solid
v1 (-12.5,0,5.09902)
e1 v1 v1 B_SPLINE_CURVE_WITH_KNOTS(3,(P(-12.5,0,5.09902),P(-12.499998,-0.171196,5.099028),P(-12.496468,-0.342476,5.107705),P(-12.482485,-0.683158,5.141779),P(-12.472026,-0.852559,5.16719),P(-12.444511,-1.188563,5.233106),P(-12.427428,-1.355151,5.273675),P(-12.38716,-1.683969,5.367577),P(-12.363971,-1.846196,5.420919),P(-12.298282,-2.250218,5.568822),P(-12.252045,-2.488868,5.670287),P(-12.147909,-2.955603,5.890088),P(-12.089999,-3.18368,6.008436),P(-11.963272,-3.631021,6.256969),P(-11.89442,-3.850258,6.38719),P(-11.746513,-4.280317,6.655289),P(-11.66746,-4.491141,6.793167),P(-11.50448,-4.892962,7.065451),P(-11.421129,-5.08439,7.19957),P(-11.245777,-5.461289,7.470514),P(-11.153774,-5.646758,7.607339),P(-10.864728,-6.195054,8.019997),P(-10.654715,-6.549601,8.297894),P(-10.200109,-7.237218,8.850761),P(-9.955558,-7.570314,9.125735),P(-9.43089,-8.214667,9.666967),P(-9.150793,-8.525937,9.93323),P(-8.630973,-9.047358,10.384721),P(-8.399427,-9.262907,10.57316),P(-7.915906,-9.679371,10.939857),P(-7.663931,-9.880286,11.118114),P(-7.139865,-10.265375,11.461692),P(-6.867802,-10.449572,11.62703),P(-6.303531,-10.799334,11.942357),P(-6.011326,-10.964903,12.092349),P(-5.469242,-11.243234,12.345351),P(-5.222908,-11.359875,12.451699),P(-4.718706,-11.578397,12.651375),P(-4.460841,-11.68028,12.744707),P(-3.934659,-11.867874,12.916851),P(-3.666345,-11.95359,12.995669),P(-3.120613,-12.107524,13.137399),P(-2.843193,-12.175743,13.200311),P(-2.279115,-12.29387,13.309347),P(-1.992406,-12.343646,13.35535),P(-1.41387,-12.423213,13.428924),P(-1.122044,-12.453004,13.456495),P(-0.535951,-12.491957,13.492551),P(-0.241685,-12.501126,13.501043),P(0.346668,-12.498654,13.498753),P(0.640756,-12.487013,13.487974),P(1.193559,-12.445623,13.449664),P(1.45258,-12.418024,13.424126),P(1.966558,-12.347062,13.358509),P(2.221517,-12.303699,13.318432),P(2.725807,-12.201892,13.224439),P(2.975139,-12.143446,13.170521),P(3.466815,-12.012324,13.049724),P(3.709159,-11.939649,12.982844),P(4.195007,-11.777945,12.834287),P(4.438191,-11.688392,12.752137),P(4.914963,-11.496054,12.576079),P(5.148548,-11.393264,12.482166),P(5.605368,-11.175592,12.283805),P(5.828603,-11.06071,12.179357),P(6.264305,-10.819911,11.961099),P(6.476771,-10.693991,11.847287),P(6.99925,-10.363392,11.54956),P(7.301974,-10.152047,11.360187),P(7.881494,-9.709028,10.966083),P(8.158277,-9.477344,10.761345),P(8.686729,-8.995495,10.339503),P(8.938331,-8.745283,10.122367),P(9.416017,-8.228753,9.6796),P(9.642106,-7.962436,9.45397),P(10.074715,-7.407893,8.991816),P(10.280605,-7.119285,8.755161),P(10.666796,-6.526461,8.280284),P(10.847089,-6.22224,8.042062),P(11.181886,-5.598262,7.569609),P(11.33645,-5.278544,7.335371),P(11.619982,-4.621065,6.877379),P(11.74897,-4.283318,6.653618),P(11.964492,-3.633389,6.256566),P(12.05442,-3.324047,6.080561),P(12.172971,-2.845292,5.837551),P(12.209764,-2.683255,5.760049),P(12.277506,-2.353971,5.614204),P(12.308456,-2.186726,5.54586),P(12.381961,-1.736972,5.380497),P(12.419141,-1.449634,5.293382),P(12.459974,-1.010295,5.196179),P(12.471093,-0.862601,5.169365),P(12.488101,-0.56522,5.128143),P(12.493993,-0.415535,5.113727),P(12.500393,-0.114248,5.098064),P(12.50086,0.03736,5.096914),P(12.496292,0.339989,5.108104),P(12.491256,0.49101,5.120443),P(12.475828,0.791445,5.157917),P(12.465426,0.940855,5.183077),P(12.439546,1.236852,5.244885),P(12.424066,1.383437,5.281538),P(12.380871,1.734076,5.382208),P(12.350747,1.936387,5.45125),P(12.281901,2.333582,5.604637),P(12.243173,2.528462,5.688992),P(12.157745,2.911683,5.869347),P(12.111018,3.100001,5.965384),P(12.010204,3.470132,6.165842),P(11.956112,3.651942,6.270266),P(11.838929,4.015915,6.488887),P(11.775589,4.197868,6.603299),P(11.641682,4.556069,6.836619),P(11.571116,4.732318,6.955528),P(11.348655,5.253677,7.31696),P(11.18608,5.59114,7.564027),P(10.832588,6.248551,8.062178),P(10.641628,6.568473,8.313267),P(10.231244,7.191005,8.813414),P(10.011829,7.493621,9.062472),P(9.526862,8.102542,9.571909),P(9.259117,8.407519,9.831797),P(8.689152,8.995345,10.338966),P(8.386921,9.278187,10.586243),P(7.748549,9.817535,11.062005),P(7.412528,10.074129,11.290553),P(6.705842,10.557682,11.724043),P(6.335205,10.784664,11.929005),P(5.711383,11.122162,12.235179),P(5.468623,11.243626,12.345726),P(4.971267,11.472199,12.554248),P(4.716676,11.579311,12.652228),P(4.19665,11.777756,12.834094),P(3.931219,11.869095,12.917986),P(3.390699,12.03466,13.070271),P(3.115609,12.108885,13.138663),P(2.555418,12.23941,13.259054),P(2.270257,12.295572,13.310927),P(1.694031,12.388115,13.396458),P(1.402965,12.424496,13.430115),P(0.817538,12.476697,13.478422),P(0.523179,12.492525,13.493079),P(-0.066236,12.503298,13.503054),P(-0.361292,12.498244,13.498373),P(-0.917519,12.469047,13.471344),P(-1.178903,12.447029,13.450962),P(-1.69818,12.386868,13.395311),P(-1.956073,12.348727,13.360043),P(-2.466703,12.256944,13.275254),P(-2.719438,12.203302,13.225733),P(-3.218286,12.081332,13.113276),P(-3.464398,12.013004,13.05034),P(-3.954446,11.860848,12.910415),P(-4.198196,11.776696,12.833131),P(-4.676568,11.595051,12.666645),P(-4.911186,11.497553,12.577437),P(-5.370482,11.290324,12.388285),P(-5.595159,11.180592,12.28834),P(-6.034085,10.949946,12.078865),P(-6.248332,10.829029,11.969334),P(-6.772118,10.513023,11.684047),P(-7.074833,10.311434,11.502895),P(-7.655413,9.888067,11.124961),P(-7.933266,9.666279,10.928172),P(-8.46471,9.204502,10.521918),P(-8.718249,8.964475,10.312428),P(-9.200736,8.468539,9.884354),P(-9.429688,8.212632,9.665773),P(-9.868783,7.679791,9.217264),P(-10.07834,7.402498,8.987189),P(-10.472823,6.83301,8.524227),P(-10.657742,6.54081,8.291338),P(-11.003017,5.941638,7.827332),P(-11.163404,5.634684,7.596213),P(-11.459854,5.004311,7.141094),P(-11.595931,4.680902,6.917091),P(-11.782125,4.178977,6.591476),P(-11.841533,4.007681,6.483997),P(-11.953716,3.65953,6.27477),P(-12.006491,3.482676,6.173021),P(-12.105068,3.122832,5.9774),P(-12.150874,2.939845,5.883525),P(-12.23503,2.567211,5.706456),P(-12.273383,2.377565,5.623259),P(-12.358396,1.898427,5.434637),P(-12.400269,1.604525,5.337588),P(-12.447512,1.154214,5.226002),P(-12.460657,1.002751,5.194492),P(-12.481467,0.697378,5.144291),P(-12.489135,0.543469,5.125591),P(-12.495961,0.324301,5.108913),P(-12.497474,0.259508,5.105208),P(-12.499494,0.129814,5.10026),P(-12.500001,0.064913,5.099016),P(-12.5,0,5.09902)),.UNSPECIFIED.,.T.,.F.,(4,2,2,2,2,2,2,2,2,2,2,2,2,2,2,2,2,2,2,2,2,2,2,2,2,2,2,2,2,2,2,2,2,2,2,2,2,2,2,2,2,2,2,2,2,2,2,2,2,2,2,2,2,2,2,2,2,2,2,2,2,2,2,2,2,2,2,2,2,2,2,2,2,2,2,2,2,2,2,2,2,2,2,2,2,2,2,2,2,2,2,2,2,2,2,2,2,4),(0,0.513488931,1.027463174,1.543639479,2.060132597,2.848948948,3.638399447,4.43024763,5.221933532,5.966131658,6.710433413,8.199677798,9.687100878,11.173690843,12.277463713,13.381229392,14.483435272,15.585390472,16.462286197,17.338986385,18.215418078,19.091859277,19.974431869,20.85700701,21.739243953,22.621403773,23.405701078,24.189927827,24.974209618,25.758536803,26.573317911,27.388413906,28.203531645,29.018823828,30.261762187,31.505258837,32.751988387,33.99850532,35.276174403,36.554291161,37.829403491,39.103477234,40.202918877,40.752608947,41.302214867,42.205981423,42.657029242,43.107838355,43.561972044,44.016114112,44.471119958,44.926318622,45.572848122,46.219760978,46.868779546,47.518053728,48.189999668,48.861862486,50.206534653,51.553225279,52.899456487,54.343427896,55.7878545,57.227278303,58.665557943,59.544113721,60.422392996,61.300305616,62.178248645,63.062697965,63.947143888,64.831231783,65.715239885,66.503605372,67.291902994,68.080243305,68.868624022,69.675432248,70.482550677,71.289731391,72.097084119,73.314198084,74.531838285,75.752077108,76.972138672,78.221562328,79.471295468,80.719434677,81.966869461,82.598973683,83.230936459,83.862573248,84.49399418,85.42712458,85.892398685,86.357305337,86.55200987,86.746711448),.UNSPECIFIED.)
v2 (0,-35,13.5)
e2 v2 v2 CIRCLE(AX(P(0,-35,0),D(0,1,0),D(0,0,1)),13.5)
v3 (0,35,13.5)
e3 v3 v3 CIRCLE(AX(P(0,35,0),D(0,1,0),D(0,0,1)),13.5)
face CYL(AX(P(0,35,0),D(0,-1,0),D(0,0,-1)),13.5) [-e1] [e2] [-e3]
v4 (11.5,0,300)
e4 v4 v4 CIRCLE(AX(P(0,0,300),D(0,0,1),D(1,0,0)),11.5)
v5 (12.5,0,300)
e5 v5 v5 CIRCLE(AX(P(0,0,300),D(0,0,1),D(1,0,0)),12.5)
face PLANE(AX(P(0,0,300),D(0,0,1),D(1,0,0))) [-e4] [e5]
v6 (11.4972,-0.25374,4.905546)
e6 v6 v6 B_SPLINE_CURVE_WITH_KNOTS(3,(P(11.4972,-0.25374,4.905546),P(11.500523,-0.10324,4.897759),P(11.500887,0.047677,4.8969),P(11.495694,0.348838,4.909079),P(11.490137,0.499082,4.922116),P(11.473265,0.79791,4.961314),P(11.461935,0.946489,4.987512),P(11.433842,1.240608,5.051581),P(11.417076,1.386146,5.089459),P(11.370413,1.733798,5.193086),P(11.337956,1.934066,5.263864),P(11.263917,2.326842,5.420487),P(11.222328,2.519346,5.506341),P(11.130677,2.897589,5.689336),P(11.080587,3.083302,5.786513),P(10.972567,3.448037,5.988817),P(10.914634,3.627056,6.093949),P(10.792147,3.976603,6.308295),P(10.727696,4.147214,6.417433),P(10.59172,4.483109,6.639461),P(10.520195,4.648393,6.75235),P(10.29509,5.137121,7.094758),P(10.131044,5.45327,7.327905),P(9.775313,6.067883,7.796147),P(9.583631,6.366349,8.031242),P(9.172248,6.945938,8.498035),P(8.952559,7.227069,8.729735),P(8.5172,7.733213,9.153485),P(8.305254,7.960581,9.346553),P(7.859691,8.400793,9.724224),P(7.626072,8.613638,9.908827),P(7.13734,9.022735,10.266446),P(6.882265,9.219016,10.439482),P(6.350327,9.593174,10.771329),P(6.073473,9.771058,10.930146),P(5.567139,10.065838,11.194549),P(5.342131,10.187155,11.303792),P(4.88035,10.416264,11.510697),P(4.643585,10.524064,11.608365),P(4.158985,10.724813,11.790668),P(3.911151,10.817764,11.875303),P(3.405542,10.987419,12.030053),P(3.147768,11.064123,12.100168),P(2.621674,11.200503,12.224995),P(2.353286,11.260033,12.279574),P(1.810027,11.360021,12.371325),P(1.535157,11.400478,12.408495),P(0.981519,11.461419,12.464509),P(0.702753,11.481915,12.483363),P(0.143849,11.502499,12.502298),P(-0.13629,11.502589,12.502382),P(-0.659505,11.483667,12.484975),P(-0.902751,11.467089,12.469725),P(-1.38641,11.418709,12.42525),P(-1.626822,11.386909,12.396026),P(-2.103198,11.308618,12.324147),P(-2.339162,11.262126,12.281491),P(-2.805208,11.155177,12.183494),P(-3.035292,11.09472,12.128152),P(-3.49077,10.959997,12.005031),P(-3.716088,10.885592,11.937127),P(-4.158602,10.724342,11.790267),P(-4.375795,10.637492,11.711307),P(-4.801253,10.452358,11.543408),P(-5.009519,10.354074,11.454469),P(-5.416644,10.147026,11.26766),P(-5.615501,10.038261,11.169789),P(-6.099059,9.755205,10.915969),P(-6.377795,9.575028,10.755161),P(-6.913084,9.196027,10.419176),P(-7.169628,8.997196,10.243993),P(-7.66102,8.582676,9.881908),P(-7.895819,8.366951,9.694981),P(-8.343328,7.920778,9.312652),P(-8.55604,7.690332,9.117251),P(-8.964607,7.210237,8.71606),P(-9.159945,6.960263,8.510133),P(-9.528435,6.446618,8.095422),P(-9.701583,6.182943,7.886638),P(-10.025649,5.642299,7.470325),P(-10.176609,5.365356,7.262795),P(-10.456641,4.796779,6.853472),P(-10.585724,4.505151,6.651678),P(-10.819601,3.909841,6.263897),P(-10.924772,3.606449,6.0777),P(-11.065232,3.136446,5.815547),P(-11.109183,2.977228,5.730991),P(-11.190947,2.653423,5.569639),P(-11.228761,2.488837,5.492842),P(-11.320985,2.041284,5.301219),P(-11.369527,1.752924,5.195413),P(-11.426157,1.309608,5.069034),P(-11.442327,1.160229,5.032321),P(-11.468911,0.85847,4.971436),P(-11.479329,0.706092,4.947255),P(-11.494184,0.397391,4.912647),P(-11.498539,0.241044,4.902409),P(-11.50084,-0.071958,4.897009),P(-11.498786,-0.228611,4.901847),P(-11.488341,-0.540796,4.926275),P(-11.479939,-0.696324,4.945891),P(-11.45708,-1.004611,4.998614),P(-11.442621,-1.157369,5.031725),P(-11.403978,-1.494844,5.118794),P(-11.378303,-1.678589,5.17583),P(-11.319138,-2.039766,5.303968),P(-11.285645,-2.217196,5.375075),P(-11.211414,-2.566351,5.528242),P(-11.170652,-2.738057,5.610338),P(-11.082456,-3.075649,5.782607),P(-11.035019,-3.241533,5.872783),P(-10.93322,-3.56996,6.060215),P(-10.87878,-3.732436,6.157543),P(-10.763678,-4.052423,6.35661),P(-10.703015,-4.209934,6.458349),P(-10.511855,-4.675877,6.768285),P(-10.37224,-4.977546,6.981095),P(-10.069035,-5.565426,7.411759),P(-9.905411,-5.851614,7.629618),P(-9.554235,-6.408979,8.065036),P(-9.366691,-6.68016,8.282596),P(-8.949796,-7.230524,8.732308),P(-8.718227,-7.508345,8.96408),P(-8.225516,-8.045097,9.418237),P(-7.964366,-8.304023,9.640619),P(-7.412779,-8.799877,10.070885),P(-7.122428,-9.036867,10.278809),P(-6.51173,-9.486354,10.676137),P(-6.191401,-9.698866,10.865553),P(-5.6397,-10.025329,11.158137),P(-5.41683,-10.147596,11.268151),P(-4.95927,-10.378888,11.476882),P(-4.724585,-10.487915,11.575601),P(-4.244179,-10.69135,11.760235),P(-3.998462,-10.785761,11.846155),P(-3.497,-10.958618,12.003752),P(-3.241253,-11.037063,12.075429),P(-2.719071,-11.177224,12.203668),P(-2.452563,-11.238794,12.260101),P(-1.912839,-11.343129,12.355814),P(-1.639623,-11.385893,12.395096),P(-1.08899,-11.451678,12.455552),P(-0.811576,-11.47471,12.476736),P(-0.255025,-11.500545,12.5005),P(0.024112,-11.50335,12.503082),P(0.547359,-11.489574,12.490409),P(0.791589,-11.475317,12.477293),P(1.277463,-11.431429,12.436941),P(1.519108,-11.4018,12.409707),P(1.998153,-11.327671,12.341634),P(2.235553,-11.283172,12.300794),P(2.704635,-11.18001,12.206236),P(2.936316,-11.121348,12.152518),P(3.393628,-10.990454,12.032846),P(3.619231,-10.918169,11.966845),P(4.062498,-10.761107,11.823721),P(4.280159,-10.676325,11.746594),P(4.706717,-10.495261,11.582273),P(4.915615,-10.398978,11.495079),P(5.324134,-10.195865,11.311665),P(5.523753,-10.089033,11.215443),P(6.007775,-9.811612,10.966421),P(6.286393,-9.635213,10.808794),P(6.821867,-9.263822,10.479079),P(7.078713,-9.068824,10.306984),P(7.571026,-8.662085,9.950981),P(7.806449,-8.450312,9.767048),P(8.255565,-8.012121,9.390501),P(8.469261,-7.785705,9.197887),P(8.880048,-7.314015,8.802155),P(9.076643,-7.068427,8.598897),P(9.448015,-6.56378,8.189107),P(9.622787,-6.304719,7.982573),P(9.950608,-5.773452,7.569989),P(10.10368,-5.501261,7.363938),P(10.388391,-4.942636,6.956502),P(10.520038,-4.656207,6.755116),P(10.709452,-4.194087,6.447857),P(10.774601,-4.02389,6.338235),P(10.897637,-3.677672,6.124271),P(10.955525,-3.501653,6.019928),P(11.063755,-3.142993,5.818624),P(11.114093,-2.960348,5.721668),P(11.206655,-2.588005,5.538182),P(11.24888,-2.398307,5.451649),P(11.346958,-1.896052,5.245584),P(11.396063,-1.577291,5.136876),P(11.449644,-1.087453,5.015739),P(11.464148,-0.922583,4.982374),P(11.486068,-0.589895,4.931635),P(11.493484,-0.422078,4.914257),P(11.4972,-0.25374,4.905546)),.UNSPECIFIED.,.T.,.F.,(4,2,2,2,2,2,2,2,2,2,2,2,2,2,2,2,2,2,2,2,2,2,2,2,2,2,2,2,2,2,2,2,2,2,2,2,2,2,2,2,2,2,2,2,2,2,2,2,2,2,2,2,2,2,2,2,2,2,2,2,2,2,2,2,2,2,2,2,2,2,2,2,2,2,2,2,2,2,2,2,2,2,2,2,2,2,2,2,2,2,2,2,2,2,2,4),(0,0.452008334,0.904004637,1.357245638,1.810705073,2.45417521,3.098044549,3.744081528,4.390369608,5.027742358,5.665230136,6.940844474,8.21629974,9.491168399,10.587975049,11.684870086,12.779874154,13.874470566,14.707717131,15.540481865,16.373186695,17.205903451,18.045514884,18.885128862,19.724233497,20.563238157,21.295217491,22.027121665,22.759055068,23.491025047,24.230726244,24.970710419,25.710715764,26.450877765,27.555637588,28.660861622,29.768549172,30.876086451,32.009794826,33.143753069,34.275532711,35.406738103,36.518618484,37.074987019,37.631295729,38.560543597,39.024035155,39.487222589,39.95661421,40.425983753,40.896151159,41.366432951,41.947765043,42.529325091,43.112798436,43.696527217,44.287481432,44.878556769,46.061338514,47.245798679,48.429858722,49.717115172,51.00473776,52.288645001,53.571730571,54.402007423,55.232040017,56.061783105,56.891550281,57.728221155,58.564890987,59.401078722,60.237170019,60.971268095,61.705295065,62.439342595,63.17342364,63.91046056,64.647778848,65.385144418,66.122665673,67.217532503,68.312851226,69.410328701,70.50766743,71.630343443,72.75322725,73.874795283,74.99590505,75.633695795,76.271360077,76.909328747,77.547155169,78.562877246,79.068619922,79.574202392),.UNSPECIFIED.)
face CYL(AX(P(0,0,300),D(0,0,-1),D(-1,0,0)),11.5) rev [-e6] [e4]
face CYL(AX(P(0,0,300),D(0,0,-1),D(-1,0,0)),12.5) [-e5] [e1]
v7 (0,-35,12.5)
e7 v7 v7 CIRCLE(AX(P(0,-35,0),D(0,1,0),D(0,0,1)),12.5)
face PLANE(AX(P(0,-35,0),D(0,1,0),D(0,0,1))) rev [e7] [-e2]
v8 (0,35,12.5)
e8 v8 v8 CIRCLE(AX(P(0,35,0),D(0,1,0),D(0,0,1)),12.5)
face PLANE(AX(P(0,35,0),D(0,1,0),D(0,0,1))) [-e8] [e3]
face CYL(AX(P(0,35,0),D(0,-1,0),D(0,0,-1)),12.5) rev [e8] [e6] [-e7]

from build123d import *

# Parameters (mm, degrees)
SKETCH1_R           = 13.5
BOSS_EXTRUDE1_DEPTH = 35
SKETCH2_R           = 12.5
BOSS_EXTRUDE2_DEPTH = 300
SHELL1_T            = -1


with BuildPart() as part:
    # Sketch1 → Boss-Extrude1 (new, symmetric)
    with BuildSketch(Plane(origin=(0, 0, 0), x_dir=(1, 0, 0), z_dir=(0, 1, 0))):
        Circle(SKETCH1_R)
    extrude(amount=BOSS_EXTRUDE1_DEPTH, both=True)

    # Sketch2 → Boss-Extrude2 (add)
    with BuildSketch(Plane.XY):
        Circle(SKETCH2_R)
    extrude(amount=BOSS_EXTRUDE2_DEPTH)

    # Shell1
    shell1_openings = [part.faces().sort_by_distance(p)[0] for p in [
        (0, 35, 0),
        (0, 0, 300),
        (0, -35, 0),
    ]]
    offset(amount=SHELL1_T, openings=shell1_openings, kind=Kind.INTERSECTION)


solid = part.part
